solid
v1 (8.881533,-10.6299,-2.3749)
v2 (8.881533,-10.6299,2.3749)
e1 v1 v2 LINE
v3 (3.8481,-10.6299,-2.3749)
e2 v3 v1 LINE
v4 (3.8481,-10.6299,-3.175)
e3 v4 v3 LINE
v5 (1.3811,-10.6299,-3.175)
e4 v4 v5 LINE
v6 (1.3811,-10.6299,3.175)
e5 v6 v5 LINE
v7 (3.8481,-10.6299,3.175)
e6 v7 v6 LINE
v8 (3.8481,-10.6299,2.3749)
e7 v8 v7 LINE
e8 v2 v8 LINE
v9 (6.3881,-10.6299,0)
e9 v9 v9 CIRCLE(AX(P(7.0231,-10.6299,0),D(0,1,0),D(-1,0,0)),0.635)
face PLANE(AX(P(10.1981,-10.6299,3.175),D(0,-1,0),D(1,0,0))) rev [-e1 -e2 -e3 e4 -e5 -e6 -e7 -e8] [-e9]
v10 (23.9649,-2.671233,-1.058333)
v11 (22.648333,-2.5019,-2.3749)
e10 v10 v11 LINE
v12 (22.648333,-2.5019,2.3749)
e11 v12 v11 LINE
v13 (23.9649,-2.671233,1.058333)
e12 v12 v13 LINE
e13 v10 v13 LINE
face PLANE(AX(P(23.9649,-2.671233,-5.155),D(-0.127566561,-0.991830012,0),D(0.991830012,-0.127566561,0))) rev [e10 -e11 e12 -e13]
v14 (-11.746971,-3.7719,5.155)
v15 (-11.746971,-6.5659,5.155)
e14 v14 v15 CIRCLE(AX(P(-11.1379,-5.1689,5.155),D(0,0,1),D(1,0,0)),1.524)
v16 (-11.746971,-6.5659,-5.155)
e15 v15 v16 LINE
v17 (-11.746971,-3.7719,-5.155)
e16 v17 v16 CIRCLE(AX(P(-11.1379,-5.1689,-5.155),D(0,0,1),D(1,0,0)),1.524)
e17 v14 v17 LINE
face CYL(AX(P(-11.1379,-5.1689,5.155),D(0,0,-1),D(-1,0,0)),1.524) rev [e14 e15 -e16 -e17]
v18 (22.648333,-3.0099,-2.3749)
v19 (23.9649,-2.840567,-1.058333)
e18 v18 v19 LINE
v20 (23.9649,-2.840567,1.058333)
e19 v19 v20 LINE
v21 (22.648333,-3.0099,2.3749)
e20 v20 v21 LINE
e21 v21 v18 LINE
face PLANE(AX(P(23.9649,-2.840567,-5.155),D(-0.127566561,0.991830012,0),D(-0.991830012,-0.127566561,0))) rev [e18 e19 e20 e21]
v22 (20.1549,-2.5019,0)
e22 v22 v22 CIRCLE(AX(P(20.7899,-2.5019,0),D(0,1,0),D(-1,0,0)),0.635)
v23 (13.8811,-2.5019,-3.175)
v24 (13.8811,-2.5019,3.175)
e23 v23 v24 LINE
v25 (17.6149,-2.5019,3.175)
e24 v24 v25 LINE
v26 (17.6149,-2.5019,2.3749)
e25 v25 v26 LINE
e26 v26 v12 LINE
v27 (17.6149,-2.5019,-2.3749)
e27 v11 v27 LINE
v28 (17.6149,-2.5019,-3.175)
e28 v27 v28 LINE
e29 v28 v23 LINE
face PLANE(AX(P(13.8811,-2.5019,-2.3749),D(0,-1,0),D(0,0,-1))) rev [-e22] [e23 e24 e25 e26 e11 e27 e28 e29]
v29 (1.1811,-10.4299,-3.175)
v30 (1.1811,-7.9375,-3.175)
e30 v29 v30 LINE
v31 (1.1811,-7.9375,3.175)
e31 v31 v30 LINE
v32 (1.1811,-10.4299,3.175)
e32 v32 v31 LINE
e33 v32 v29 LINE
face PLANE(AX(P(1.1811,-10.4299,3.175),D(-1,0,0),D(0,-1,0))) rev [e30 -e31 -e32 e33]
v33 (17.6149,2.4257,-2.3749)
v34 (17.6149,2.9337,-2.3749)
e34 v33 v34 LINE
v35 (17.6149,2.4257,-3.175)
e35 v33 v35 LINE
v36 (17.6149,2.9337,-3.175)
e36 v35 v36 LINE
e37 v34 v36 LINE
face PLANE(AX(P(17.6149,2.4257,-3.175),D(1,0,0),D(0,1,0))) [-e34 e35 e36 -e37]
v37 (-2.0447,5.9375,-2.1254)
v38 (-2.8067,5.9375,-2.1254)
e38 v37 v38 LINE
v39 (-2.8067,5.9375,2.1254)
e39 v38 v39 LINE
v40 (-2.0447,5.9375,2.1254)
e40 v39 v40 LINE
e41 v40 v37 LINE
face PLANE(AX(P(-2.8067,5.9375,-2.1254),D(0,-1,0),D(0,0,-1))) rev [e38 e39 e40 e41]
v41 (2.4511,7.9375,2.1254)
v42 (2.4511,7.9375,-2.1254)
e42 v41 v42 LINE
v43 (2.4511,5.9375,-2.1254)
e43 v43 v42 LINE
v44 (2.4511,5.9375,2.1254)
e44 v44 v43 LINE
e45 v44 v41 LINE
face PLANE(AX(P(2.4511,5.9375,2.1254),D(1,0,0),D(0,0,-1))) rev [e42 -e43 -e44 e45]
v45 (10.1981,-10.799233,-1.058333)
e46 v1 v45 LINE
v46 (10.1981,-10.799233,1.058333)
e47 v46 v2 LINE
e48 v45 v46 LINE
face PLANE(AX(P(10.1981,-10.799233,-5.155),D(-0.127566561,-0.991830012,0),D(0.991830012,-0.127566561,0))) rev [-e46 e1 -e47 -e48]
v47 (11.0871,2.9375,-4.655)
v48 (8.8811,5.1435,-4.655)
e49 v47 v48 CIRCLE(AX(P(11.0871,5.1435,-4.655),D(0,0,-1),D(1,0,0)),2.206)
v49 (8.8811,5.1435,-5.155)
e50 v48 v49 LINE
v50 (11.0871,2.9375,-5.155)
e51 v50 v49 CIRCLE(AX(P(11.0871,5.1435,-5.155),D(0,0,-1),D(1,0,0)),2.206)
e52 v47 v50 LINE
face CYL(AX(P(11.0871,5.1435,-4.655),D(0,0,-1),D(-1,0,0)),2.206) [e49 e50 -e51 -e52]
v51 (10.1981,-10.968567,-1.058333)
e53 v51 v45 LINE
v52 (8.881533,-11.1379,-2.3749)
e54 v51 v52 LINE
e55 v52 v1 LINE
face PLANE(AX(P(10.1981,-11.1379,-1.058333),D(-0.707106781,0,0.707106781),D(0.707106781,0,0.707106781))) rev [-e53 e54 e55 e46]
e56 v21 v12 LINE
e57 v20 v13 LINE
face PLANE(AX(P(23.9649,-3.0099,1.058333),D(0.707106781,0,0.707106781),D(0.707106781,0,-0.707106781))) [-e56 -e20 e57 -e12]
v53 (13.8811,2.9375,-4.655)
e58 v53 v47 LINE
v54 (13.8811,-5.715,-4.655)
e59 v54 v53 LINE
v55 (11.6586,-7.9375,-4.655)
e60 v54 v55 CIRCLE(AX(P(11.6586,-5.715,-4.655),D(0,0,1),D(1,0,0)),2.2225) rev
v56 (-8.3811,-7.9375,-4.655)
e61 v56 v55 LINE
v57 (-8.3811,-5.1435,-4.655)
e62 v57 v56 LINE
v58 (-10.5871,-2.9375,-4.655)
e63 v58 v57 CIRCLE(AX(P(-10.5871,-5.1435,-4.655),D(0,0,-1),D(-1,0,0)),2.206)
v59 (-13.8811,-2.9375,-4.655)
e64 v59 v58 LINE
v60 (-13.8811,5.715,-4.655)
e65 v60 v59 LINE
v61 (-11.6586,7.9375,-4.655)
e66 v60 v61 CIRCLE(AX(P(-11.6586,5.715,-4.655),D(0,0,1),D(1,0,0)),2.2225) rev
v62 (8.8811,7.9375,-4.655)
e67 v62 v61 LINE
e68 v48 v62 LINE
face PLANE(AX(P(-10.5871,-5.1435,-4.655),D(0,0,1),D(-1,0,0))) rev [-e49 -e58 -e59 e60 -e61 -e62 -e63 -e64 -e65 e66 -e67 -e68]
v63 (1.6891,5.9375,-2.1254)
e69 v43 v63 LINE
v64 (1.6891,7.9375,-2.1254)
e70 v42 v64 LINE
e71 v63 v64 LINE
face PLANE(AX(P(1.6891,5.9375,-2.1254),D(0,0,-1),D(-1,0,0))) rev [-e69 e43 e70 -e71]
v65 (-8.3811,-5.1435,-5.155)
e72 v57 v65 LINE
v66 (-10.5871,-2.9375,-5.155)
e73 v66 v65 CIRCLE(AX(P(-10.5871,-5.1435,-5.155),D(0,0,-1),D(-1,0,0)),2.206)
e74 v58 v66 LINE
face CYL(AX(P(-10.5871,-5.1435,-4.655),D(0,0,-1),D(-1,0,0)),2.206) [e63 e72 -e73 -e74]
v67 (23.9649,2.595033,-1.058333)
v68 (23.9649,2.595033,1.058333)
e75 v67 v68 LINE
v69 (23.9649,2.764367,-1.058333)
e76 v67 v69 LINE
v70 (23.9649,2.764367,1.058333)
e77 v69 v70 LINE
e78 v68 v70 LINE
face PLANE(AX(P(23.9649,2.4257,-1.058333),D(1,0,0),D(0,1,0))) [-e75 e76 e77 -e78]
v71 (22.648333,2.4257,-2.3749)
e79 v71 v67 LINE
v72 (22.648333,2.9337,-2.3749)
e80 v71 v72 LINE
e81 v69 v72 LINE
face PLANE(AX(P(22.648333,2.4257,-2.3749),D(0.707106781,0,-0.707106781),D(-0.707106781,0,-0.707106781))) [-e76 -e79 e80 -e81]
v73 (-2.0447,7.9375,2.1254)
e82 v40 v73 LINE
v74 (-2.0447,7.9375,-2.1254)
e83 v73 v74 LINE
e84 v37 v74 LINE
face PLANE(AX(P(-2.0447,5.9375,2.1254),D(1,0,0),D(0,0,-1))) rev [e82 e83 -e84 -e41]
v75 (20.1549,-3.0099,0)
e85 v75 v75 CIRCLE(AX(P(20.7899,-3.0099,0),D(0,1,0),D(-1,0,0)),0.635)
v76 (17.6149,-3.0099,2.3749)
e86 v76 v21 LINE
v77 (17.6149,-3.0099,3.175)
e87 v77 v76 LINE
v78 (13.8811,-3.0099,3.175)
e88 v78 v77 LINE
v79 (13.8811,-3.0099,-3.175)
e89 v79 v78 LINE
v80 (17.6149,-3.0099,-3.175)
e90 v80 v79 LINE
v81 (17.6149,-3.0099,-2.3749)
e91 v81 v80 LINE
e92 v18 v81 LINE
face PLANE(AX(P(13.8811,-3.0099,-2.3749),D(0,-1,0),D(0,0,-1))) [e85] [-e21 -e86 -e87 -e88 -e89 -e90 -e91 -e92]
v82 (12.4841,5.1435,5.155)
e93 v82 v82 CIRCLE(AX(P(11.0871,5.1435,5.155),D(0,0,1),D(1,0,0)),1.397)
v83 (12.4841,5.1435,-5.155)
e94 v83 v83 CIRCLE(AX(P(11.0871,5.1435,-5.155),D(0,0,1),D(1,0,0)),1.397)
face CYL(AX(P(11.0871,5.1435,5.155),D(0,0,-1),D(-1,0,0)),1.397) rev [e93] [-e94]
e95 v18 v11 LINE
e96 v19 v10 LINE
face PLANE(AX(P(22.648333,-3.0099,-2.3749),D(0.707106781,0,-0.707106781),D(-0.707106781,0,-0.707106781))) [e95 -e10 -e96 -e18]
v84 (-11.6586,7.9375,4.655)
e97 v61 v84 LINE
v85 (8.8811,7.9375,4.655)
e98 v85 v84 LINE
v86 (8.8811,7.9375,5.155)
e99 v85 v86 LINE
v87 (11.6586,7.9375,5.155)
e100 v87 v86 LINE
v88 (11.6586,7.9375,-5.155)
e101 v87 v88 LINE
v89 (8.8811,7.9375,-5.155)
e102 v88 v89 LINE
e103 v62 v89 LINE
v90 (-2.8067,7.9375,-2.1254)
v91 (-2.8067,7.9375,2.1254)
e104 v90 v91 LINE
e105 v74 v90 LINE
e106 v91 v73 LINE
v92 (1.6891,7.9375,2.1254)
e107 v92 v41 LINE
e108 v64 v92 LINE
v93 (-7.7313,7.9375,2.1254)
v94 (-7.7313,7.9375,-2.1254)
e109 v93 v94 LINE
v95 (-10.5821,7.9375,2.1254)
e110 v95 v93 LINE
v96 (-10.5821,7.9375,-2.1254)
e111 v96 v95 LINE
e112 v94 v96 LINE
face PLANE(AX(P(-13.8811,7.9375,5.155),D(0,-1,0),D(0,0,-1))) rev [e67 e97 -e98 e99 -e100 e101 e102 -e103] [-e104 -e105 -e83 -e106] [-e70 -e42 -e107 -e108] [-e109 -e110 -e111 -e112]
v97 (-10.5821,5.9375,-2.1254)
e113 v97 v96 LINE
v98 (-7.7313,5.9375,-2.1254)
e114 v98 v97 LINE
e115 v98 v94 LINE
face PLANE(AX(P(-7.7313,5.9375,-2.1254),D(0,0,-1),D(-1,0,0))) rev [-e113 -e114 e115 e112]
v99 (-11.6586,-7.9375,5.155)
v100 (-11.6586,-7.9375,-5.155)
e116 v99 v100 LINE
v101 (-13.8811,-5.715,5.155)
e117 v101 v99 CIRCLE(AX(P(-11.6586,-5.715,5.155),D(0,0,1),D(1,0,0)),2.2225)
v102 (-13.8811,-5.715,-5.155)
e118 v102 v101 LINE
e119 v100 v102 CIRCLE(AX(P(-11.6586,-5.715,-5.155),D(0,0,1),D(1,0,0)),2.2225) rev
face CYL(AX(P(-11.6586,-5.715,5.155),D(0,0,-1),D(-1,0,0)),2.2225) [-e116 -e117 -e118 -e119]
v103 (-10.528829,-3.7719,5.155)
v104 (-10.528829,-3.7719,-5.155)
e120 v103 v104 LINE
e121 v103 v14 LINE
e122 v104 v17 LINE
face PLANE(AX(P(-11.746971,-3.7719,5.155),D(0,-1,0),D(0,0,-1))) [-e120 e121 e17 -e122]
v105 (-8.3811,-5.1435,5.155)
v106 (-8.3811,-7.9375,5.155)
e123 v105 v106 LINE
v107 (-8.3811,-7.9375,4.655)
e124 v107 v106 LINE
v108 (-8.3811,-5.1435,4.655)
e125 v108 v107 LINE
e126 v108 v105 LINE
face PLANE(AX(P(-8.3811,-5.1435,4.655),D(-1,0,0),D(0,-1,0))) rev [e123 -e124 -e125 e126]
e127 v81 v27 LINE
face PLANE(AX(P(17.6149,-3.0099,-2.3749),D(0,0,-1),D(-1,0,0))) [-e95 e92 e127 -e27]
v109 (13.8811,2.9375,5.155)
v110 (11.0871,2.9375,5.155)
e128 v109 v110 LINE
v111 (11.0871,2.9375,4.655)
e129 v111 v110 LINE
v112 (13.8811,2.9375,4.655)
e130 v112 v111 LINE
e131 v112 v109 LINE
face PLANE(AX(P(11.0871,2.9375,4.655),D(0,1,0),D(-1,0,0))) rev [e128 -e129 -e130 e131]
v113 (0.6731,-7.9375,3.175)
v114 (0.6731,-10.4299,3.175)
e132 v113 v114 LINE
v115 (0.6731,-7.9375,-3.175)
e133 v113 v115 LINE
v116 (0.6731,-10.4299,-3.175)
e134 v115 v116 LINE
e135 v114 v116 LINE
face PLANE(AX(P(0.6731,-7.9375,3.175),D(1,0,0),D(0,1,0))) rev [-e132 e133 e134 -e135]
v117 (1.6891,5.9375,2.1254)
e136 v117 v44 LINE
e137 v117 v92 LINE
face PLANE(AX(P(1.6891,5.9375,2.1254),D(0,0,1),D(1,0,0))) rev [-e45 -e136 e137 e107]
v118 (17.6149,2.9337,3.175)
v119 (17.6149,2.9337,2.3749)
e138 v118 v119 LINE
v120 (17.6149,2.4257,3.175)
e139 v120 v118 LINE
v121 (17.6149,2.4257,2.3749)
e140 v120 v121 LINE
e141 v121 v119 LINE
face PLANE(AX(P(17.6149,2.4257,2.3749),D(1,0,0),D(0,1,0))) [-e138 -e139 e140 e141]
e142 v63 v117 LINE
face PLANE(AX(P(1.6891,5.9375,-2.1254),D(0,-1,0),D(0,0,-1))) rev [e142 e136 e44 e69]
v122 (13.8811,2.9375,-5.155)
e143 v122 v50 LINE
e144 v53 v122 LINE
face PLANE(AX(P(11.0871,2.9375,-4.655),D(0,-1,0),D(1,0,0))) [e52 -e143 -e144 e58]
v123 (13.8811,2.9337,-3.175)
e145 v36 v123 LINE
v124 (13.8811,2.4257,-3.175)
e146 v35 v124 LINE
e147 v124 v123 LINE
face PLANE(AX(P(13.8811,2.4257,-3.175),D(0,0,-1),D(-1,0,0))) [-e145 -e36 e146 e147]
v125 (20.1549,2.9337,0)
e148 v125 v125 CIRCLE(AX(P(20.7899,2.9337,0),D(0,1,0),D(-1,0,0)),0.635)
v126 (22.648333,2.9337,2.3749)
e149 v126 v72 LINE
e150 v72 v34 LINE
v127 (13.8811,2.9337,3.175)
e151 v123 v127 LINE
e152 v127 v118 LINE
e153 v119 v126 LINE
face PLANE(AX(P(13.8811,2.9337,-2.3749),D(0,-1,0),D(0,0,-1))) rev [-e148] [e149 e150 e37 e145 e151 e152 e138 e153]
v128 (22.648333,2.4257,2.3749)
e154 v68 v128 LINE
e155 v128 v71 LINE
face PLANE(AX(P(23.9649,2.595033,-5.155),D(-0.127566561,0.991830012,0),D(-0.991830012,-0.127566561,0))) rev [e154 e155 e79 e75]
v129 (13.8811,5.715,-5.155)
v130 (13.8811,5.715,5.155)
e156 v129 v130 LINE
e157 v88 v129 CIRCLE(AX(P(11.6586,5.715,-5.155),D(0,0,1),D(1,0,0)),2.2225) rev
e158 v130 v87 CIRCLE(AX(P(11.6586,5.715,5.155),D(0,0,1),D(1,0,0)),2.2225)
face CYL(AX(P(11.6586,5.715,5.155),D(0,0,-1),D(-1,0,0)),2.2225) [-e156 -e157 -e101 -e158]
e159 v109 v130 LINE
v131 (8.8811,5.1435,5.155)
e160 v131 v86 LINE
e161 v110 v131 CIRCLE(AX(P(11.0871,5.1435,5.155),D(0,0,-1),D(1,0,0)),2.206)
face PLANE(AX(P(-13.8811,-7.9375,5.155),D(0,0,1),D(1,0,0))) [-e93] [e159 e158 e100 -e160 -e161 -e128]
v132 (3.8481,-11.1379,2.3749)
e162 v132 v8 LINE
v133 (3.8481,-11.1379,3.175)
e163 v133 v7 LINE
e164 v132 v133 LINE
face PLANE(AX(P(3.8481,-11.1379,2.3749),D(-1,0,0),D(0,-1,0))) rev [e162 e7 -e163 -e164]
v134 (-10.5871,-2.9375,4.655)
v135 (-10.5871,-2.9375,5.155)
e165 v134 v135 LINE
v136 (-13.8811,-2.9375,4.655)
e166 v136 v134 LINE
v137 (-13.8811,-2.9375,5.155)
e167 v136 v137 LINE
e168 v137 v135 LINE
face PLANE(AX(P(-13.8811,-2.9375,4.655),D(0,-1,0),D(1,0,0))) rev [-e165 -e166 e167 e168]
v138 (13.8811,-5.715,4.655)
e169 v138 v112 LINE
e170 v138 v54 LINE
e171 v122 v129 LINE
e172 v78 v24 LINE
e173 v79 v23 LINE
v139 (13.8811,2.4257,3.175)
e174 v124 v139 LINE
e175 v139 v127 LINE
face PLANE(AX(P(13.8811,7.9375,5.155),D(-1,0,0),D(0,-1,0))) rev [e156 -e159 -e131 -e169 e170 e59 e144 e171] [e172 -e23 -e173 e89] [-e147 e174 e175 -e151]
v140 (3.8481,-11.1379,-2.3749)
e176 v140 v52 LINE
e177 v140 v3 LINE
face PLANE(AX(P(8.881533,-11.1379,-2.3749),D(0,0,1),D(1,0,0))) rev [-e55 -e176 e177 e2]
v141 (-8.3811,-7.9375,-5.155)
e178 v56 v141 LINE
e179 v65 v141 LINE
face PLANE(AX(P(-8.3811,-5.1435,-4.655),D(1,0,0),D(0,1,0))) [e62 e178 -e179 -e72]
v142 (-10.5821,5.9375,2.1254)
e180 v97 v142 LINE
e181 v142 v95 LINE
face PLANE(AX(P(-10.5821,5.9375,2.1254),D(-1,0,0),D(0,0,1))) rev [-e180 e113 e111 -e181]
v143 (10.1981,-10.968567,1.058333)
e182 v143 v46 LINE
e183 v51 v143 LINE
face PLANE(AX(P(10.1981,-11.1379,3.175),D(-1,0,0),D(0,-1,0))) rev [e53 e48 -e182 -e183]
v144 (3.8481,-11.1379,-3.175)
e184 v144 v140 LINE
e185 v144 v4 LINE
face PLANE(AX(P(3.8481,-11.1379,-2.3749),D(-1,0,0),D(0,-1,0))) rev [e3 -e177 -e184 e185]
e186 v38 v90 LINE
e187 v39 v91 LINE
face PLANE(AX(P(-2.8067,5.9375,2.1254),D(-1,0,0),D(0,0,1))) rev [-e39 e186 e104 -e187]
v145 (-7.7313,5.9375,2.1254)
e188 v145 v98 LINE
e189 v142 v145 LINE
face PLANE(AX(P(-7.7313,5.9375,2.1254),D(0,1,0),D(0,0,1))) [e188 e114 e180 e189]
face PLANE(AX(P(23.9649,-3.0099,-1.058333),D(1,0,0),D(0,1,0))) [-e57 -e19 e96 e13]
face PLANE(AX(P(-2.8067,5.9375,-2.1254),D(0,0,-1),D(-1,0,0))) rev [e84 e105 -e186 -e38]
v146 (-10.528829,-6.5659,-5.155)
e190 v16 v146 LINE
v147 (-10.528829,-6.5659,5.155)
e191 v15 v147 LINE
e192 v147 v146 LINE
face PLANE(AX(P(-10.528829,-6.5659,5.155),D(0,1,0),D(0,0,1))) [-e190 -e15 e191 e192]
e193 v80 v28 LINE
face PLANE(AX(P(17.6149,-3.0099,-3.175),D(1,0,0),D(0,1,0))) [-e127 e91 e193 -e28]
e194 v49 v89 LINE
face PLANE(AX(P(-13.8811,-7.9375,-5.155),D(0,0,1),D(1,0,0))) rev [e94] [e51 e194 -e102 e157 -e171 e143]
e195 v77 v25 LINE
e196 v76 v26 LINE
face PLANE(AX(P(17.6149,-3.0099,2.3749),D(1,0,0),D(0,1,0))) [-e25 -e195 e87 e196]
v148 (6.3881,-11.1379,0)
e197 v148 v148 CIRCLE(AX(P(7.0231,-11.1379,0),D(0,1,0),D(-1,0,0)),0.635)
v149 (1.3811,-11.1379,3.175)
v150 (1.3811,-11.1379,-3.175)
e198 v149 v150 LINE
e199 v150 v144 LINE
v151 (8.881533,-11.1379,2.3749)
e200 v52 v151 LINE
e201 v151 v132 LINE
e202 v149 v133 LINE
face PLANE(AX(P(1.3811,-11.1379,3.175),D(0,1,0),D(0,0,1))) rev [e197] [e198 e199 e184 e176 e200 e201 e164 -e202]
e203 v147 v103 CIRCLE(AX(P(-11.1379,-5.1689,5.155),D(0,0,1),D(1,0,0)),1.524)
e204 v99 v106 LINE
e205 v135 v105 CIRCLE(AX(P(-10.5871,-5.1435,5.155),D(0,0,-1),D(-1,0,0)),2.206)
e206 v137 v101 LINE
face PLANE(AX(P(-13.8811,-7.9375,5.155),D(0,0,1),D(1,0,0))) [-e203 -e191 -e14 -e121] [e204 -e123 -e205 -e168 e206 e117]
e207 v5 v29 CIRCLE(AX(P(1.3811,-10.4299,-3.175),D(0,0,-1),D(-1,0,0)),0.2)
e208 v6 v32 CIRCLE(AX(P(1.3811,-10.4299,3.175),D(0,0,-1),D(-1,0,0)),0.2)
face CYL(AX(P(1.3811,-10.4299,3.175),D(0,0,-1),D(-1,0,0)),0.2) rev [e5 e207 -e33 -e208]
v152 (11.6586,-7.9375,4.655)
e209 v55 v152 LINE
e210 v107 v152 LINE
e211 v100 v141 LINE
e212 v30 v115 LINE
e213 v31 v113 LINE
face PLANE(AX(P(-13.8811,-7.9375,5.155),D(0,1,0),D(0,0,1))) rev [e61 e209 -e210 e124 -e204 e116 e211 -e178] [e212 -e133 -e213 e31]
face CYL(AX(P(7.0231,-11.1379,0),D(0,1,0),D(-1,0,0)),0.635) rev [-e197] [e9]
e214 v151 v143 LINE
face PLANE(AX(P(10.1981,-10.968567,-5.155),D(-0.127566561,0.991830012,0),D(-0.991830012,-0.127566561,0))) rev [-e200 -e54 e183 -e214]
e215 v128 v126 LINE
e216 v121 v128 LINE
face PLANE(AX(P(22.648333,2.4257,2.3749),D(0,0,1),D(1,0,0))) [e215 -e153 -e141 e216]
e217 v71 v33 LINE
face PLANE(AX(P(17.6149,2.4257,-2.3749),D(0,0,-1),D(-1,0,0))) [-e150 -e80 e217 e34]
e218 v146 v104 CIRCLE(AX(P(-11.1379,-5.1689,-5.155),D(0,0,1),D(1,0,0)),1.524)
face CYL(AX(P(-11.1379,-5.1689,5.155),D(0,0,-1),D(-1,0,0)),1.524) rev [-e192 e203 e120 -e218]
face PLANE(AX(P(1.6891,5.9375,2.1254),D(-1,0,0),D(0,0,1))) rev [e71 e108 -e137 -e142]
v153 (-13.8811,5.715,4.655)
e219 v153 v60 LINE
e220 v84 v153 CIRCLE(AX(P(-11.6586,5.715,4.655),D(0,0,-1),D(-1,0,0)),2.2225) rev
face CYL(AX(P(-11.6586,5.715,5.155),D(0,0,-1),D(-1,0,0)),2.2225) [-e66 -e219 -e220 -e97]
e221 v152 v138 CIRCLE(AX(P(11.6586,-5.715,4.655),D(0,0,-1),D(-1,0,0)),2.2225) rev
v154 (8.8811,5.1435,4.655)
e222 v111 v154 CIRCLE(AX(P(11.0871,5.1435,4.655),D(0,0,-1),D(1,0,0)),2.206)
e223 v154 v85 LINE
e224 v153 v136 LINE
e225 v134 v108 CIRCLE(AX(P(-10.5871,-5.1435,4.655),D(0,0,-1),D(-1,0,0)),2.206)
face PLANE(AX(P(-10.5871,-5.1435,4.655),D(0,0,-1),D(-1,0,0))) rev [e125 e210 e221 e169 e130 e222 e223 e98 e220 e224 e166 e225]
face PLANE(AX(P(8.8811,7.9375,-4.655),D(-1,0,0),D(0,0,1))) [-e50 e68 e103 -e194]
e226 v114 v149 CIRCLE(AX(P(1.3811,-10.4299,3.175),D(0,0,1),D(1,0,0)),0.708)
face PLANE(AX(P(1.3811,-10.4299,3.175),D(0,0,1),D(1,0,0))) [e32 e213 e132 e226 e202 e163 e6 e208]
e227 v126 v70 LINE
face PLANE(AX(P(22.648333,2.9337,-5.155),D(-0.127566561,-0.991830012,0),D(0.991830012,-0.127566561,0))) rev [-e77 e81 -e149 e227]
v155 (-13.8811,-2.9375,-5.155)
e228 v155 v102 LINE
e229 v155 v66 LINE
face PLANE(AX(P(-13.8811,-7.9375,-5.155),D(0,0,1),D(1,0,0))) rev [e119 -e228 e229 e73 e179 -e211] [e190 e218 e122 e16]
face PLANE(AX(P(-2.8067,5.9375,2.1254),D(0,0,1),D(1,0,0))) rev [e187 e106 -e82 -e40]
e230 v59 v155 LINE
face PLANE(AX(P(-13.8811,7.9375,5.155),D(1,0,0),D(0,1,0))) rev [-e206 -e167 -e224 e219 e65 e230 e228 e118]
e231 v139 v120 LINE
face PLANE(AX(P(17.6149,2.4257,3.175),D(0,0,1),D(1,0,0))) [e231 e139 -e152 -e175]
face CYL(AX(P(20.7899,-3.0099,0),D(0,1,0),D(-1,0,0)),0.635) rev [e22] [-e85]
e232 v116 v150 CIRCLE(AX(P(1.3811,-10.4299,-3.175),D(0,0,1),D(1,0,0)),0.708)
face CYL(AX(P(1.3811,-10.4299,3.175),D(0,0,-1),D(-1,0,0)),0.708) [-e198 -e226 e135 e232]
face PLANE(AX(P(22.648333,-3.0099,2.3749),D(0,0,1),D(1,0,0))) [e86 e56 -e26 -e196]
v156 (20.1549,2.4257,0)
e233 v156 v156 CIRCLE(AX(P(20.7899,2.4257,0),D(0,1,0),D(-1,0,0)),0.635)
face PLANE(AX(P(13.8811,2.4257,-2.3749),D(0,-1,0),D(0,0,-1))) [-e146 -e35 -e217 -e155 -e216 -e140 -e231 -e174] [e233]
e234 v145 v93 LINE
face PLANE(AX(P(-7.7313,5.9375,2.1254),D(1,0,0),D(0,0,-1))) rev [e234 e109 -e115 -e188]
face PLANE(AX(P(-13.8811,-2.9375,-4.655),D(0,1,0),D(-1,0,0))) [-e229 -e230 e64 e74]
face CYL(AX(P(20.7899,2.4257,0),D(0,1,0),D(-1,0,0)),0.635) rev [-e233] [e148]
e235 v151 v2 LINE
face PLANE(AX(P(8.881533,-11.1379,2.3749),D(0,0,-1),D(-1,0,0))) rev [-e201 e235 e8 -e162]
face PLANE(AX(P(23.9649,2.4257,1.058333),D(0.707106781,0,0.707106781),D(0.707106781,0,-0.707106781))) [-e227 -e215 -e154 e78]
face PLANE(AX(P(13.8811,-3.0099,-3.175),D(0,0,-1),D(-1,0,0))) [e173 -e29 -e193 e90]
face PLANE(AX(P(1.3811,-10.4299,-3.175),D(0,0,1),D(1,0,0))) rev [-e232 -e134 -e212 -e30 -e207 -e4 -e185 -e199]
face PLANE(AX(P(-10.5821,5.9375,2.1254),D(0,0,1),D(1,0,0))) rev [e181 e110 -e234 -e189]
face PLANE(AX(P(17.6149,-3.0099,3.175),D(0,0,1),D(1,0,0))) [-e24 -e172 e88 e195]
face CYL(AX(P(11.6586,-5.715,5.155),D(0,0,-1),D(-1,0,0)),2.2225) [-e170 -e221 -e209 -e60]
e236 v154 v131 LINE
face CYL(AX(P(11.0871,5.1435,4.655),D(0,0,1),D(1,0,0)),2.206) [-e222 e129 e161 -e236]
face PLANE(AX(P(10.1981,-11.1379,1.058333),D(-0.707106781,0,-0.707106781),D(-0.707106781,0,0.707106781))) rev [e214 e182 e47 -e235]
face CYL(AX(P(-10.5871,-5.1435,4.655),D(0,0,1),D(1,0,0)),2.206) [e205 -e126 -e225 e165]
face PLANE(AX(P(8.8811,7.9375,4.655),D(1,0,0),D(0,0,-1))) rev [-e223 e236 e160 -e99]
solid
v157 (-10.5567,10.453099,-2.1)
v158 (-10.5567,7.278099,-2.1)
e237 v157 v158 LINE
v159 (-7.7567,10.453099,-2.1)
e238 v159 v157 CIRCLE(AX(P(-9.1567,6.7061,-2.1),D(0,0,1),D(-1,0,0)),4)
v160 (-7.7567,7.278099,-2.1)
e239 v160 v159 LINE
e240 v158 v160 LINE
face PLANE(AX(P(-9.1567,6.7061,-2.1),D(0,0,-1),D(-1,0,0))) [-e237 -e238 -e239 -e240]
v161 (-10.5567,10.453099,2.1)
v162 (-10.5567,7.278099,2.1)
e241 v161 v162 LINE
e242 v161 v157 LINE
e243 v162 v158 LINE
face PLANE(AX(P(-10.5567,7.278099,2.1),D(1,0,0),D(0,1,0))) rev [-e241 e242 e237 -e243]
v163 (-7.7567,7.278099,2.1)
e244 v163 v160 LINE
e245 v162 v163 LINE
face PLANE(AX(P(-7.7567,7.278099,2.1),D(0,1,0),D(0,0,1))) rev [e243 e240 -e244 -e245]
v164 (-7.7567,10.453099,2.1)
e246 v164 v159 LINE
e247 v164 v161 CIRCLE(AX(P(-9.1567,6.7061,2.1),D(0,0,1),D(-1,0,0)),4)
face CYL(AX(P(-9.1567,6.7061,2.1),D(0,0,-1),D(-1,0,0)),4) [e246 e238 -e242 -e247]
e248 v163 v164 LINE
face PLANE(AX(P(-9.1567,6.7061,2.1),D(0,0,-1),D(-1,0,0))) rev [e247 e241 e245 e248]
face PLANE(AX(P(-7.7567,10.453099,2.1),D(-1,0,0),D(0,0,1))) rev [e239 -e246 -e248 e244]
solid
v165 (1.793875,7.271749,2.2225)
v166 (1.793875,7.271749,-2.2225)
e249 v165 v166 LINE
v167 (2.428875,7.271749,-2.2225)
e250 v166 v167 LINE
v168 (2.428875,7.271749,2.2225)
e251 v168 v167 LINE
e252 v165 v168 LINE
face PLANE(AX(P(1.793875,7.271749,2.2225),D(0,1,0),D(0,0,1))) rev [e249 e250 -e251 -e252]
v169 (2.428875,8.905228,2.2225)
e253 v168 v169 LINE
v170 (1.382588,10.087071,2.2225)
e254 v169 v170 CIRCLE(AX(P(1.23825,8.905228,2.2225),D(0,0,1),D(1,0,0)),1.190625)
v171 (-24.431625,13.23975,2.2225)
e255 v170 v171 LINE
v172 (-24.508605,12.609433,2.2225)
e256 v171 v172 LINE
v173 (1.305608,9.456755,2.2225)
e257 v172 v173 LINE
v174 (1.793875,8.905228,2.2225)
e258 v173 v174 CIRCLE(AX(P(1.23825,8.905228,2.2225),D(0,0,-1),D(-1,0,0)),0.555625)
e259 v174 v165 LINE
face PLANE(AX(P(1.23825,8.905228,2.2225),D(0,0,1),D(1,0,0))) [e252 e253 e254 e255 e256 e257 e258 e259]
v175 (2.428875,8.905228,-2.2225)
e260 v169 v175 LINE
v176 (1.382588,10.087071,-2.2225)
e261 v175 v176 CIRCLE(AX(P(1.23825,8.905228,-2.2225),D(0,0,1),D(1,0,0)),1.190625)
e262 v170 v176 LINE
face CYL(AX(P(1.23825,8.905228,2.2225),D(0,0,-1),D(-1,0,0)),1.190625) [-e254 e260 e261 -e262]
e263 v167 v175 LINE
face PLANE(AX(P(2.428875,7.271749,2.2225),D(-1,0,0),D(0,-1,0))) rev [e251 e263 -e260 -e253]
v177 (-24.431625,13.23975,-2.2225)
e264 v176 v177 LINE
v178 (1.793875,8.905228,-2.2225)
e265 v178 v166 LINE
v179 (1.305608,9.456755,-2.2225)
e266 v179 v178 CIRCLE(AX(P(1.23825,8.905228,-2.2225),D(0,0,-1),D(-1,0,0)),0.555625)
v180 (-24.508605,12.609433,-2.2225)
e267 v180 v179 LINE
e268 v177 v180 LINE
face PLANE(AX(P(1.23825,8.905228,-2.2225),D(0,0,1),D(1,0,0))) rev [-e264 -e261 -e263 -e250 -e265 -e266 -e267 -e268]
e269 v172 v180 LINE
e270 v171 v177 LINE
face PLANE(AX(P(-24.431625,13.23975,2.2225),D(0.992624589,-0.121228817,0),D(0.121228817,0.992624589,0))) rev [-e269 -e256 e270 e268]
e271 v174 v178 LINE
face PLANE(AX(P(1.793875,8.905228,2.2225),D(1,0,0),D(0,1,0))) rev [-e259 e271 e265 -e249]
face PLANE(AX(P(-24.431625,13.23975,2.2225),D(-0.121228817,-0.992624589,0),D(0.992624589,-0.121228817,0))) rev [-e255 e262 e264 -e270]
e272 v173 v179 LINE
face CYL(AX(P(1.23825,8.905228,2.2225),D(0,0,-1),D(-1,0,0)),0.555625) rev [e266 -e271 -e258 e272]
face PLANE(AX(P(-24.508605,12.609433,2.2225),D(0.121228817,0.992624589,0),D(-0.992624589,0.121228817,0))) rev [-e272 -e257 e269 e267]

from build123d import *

# Parameters (mm, degrees)
SKETCH1_W               = 27.7622
SKETCH1_H               = 15.875
SKETCH1_R               = 1.397
EXTRUDE1_DEPTH          = 5.155
FILLET1_R               = 2.2225
EXTRUDE2_DEPTH          = 2.1
SKETCH3_W               = 2.8508
SKETCH3_H               = 4.2508
SKETCH3_W_2             = 0.762
CUT_EXTRUDE1_DEPTH      = 2
CUT_EXTRUDE2_DEPTH      = 0.5
EXTRUDE3_DEPTH          = 3.175
SKETCH6_R               = 0.635
CUT_EXTRUDE3_DEPTH      = 26.970827061
EXTRUDE4_START          = -5.5118
EXTRUDE4_OUTLINE_R      = 0.635
EXTRUDE4_DEPTH          = 0.508
LPATTERN1_COUNT         = 2
LPATTERN1_PITCH         = 5.4356
CUT_EXTRUDE4_DEPTH      = 27.924770629
CUT_EXTRUDE4_DEPTH_BACK = 27.924770629
BODY_MOVE_COPY2_START   = -2.2225
BODY_MOVE_COPY2_DEPTH   = 4.445


# Read off the part's stored shape, not the designer's step: Extrude4, Body-Move/Copy2
with BuildPart() as part:
    # Sketch1 → Extrude1 (new, symmetric)
    with BuildSketch(Plane.XY):
        Rectangle(SKETCH1_W, SKETCH1_H)
        with Locations((11.0871, 5.1435)):
            Circle(SKETCH1_R, mode=Mode.SUBTRACT)
        with BuildLine():
            Line((-11.746970603, -3.7719), (-10.528829397, -3.7719))
            ThreePointArc((-10.528829397, -3.7719), (-9.6139, -5.1689), (-10.528829397, -6.5659))
            Line((-10.528829397, -6.5659), (-11.746970603, -6.5659))
            ThreePointArc((-11.746970603, -6.5659), (-12.6619, -5.1689), (-11.746970603, -3.7719))
        make_face(mode=Mode.SUBTRACT)
    extrude(amount=EXTRUDE1_DEPTH, both=True)

    # Fillet1
    fillet1_edges = [part.edges().sort_by_distance(p)[0] for p in [
        (-13.8811, 7.9375, 0),
        (13.8811, 7.9375, 0),
        (13.8811, -7.9375, 0),
        (-13.8811, -7.9375, 0),
    ]]
    fillet(fillet1_edges, radius=FILLET1_R)

    # Sketch3 → Cut-Extrude1 (cut)
    with BuildSketch(Plane(origin=(0, 7.9375, 0), x_dir=(-1, 0, 0), z_dir=(0, 1, 0))):
        with Locations((9.1567, 0)):
            Rectangle(SKETCH3_W, SKETCH3_H)
        with Locations((2.4257, 0)):
            Rectangle(SKETCH3_W_2, SKETCH3_H)
        with Locations((-2.0701, 0)):
            Rectangle(SKETCH3_W_2, SKETCH3_H)
    extrude(amount=-CUT_EXTRUDE1_DEPTH, mode=Mode.SUBTRACT)

    # Sketch4 → Cut-Extrude2 (cut)
    with BuildSketch(Plane.XY.offset(5.155)):
        with BuildLine():
            Line((-8.3811, -7.9375), (13.8811, -7.9375))
            Line((13.8811, -7.9375), (13.8811, 2.9375))
            Line((13.8811, 2.9375), (11.0871, 2.9375))
            ThreePointArc((11.0871, 2.9375), (9.527222441, 3.583622441), (8.8811, 5.1435))
            Line((8.8811, 5.1435), (8.8811, 7.9375))
            Line((8.8811, 7.9375), (-13.8811, 7.9375))
            Line((-13.8811, 7.9375), (-13.8811, -2.9375))
            Line((-13.8811, -2.9375), (-10.5871, -2.9375))
            ThreePointArc((-10.5871, -2.9375), (-9.027222441, -3.583622441), (-8.3811, -5.1435))
            Line((-8.3811, -5.1435), (-8.3811, -7.9375))
        make_face()
    cut_extrude2 = extrude(amount=-CUT_EXTRUDE2_DEPTH, mode=Mode.SUBTRACT)

    # Mirror1: Cut-Extrude2 across plane
    add(cut_extrude2.mirror(Plane.XY), mode=Mode.SUBTRACT)

    # Sketch5 → Extrude3 (add, symmetric)
    with BuildSketch(Plane.XY):
        with BuildLine():
            Line((0.6731, -7.9375), (0.6731, -10.4299))
            ThreePointArc((0.6731, -10.4299), (0.880468399, -10.930531601), (1.3811, -11.1379))
            Line((1.3811, -11.1379), (10.1981, -11.1379))
            Line((10.1981, -11.1379), (10.1981, -10.6299))
            Line((10.1981, -10.6299), (1.3811, -10.6299))
            ThreePointArc((1.3811, -10.6299), (1.239678644, -10.571321356), (1.1811, -10.4299))
            Line((1.1811, -10.4299), (1.1811, -7.9375))
            Line((1.1811, -7.9375), (0.6731, -7.9375))
        make_face()
    extrude(amount=EXTRUDE3_DEPTH, both=True)

    # Sketch6 → Cut-Extrude3 (cut, through all)
    with BuildSketch(Plane(origin=(0, -10.6299, 0), x_dir=(-1, 0, 0), z_dir=(0, 1, 0))):
        with Locations((-7.0231, 0)):
            Circle(SKETCH6_R)
        Polygon((-10.1981, 1.058333333), (-8.881533333, 2.3749), (-3.8481, 2.3749), (-3.8481, 3.175), (-10.1981, 3.175), align=None)
        Polygon((-10.1981, -3.175), (-10.1981, -1.058333333), (-8.881533333, -2.3749), (-3.8481, -2.3749), (-3.8481, -3.175), align=None)
    extrude(amount=-CUT_EXTRUDE3_DEPTH, mode=Mode.SUBTRACT)

    # Extrude4 outline → Extrude4 (add)
    with BuildSketch(Plane(origin=(0, 7.9375, 0), x_dir=(-1, 0, 0), z_dir=(0, 1, 0)).offset(EXTRUDE4_START)):
        Polygon((-13.8811, -3.175), (-13.8811, 3.175), (-17.6149, 3.175), (-17.6149, 2.3749), (-22.648333333, 2.3749), (-23.9649, 1.058333333), (-23.9649, -1.058333333), (-22.648333333, -2.3749), (-17.6149, -2.3749), (-17.6149, -3.175), align=None)
        with Locations((-20.7899, 0)):
            Circle(EXTRUDE4_OUTLINE_R, mode=Mode.SUBTRACT)
    extrude4 = extrude(amount=EXTRUDE4_DEPTH)

    # LPattern1: Extrude4 ×2
    with Locations(*[(0, -i * LPATTERN1_PITCH, 0) for i in range(1, LPATTERN1_COUNT)]):
        add(extrude4)

    # Sketch7 → Cut-Extrude4 (cut, two sides: drawn at the far end of the back side and taken through both)
    with BuildSketch(Plane.XY.offset(-CUT_EXTRUDE4_DEPTH_BACK)):
        Polygon((8.881533333, -10.6299), (10.1981, -10.6299), (10.1981, -10.799233333), align=None)
        Polygon((8.881533333, -11.1379), (10.1981, -11.1379), (10.1981, -10.968566667), align=None)
        Polygon((22.648333333, 2.9337), (23.9649, 2.764366667), (23.9649, 2.9337), align=None)
        Polygon((23.9649, 2.595033333), (22.648333333, 2.4257), (23.9649, 2.4257), align=None)
        Polygon((22.648333333, -2.5019), (23.9649, -2.5019), (23.9649, -2.671233333), align=None)
        Polygon((23.9649, -2.840566667), (22.648333333, -3.0099), (23.9649, -3.0099), align=None)
    extrude(amount=CUT_EXTRUDE4_DEPTH + CUT_EXTRUDE4_DEPTH_BACK, mode=Mode.SUBTRACT)


with BuildPart() as body_2:
    # Sketch2 → Extrude2 (new, symmetric)
    with BuildSketch(Plane.XY):
        with BuildLine():
            Line((-10.5567, 7.278098799), (-10.5567, 10.453098799))
            ThreePointArc((-10.5567, 10.453098799), (-9.1567, 10.7061), (-7.7567, 10.453098799))
            Line((-7.7567, 10.453098799), (-7.7567, 7.278098799))
            Line((-7.7567, 7.278098799), (-10.5567, 7.278098799))
        make_face()
    extrude(amount=EXTRUDE2_DEPTH, both=True)


with BuildPart() as body_3:
    # Body-Move/Copy2 outline → Body-Move/Copy2 (new body)
    with BuildSketch(Plane.XY.offset(BODY_MOVE_COPY2_START)):
        with BuildLine():
            Line((1.793875, 7.271748799), (2.428875, 7.271748799))
            Line((2.428875, 7.271748799), (2.428875, 8.905227531))
            ThreePointArc((2.428875, 8.905227531), (2.129720805, 9.694447205), (1.38258806, 10.087071181))
            Line((1.38258806, 10.087071181), (-24.431625, 13.23975))
            Line((-24.431625, 13.23975), (-24.508605299, 12.609433386))
            Line((-24.508605299, 12.609433386), (1.305607762, 9.456754568))
            ThreePointArc((1.305607762, 9.456754568), (1.654269709, 9.273530045), (1.793875, 8.905227531))
            Line((1.793875, 8.905227531), (1.793875, 7.271748799))
        make_face()
    extrude(amount=BODY_MOVE_COPY2_DEPTH)


solid = Compound([part.part, body_2.part, body_3.part])
